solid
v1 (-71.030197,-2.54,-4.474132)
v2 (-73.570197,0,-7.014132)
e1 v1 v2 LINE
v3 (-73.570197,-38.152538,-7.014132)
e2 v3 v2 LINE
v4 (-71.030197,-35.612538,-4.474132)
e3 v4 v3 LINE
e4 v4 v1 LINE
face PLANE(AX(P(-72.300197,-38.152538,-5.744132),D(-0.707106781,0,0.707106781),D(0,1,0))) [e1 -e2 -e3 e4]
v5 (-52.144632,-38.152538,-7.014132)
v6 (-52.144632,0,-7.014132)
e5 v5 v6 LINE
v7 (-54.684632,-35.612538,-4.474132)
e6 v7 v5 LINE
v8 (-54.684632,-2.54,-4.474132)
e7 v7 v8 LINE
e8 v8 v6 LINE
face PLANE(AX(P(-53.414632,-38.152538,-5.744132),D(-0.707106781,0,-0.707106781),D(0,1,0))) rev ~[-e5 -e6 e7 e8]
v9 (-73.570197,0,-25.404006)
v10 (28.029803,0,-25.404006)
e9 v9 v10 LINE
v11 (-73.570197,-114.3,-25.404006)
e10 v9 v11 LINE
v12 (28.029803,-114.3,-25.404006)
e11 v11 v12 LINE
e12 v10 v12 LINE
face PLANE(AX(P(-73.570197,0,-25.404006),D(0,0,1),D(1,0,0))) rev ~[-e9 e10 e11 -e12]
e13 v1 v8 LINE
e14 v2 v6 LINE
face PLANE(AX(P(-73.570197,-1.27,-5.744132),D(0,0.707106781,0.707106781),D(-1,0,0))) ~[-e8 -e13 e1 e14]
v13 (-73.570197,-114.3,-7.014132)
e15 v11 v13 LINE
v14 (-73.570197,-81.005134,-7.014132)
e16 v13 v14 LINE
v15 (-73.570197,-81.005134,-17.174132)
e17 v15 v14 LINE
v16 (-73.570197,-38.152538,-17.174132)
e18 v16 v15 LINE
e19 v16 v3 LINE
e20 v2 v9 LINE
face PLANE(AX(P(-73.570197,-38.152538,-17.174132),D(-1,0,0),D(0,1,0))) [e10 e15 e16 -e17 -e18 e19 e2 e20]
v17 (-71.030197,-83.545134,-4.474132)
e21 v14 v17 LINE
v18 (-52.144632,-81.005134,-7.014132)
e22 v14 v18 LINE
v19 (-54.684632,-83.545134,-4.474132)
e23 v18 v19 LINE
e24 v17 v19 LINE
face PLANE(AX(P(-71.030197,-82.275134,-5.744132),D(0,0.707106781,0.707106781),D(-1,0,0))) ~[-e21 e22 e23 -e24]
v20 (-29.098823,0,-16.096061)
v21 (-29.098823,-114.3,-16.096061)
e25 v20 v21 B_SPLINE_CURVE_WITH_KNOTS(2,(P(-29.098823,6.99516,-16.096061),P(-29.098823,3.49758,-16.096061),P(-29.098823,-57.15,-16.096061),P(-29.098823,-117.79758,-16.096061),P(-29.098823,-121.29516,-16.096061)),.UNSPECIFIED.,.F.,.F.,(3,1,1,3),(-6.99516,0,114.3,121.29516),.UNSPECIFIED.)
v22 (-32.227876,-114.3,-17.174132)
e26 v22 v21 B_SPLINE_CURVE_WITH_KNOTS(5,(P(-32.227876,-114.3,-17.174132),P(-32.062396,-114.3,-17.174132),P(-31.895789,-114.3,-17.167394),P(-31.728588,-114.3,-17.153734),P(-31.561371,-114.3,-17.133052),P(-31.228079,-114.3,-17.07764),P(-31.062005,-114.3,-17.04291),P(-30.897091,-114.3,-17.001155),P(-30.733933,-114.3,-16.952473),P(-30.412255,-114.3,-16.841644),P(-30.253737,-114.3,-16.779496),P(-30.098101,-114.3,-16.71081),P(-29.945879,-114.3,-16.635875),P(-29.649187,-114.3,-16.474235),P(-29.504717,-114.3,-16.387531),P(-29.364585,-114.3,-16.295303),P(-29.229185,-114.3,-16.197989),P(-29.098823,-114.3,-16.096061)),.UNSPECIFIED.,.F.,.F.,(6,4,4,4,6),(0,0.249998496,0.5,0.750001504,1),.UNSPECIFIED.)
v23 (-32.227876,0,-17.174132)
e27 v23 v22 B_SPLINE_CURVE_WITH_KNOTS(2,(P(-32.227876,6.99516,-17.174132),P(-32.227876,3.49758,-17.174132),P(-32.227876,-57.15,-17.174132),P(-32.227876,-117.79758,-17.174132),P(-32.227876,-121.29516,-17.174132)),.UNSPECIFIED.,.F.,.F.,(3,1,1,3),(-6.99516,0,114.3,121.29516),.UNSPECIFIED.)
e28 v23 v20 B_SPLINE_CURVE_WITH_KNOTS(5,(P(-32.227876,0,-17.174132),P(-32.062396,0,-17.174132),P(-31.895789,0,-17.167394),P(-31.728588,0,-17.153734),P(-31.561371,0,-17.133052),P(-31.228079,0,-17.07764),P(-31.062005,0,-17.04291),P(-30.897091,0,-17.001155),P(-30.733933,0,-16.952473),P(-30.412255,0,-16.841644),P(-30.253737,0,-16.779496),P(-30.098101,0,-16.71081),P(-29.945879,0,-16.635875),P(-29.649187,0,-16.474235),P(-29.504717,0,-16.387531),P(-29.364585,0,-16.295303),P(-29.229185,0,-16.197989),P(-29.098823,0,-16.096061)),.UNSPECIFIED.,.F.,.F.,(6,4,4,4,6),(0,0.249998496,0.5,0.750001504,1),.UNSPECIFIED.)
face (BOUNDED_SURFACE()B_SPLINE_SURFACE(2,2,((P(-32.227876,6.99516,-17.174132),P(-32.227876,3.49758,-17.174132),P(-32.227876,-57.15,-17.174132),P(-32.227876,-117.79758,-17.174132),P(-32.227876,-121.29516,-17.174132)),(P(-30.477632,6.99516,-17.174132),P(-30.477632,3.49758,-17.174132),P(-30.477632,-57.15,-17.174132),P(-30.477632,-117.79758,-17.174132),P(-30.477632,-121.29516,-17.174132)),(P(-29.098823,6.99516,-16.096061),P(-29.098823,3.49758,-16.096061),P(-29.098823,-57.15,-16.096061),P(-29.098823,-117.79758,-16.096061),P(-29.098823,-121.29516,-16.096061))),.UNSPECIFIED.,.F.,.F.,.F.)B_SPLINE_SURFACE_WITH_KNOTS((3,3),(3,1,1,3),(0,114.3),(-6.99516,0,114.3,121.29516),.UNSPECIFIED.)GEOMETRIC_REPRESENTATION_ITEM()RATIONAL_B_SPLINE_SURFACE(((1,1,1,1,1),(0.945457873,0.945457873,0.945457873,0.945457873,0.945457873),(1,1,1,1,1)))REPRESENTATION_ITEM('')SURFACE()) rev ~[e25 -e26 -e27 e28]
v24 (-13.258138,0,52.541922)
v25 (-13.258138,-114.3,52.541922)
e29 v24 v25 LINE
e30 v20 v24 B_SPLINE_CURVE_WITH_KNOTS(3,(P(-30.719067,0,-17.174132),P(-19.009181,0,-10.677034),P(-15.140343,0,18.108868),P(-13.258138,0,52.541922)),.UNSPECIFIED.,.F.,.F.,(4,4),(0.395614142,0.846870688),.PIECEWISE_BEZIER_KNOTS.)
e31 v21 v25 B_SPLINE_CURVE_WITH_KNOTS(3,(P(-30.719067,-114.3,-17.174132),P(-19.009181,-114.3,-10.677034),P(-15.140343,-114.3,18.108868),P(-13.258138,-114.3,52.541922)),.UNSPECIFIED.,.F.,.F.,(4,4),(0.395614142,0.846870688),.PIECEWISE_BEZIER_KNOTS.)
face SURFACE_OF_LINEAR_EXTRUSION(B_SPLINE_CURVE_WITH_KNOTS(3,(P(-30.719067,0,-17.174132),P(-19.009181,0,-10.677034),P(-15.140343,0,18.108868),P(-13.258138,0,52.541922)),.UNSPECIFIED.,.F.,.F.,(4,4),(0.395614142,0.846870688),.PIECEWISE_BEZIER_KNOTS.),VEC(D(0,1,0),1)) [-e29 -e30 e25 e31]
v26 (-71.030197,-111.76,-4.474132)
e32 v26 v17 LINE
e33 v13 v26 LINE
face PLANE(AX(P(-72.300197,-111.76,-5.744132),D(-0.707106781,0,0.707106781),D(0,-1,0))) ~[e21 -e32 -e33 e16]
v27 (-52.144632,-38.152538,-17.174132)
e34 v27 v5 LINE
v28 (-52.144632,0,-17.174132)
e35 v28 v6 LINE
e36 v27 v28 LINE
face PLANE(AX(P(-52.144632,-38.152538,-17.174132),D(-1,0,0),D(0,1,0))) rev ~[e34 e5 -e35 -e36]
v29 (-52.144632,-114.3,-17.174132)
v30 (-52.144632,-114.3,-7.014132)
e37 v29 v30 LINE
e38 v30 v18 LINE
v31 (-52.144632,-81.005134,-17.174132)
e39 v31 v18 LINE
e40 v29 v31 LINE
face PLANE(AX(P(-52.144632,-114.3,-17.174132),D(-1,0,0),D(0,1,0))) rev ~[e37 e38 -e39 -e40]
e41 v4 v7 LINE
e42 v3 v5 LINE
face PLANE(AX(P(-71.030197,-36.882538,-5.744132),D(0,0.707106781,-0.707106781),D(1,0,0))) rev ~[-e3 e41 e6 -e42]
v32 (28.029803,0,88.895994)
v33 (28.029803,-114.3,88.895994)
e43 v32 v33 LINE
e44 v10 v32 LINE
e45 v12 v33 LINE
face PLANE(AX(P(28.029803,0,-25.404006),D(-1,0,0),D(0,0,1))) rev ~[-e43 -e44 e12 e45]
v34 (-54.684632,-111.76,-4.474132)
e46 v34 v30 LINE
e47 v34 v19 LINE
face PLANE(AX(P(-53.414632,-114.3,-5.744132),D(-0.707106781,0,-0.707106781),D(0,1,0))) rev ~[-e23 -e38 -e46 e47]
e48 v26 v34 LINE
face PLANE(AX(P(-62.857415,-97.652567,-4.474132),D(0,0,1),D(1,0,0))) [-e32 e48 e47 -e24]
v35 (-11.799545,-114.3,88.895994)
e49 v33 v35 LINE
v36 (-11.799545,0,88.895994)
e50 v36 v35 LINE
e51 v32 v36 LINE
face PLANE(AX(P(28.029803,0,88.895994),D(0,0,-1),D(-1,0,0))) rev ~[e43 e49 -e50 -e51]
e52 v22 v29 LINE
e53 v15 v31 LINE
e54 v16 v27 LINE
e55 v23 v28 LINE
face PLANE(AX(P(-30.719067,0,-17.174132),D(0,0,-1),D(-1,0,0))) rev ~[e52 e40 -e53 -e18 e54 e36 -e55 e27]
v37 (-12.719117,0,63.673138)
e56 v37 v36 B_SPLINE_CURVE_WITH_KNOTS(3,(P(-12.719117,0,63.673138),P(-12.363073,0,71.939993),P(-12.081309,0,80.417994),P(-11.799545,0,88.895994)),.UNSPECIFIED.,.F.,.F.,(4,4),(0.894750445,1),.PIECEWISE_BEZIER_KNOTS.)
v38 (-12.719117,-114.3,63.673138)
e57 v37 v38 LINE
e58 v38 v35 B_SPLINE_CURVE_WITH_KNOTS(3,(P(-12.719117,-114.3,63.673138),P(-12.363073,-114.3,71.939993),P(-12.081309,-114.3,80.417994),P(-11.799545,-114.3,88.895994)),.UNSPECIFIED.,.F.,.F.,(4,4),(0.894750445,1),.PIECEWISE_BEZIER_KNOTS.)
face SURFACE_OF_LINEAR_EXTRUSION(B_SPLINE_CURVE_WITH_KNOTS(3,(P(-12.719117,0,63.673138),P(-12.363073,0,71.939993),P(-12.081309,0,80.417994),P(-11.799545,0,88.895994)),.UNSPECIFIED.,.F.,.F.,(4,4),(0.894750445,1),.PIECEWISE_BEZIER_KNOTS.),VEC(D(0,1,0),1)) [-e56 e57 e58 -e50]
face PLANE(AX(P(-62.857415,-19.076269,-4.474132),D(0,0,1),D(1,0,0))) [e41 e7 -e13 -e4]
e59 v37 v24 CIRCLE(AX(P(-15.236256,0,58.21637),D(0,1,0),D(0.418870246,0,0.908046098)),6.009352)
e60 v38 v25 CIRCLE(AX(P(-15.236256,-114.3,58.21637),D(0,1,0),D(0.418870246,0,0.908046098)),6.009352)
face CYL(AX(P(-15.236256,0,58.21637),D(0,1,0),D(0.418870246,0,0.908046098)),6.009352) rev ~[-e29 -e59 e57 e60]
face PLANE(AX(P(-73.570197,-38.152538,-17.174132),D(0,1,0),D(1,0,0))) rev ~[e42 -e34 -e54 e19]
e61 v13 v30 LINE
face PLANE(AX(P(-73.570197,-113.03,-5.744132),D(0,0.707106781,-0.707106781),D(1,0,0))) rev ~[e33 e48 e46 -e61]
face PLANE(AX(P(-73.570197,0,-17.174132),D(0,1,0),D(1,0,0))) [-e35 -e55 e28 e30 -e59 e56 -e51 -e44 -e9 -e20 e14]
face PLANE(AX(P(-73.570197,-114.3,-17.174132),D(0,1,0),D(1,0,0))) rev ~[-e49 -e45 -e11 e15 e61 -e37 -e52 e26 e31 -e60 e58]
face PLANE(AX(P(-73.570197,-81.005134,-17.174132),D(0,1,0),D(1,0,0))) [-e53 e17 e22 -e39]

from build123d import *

# Parameters (mm, degrees)
F7_DEPTH = 114.3
F0_W     = 21.425565113
F0_H     = 33.2948663116
F8_DEPTH = 12.7
F0_H_2   = 38.15253824
F9_DEPTH = 12.7
F10_SIZE = 2.54
F1_SIZE  = 2.54
F11_SIZE = 2.54
F2_SIZE  = 2.54
F12_SIZE = 2.54
F3_SIZE  = 2.54
F4_SIZE  = 2.54
F13_R    = 5.08


# Not quite as in the source:
# - a feature of the source that left no trace in its solid (it failed there, or was rolled back) is left out


with BuildPart() as f7:
    # F6 (on Front) → F7 (new body)
    with BuildSketch(Plane.XZ):
        with BuildLine():
            Line((28.0298027718, 88.895993849), (-11.7995445112, 88.895993849))
            add(Edge.make_bspline(
                [(-12.7191172273, 63.6731384112), (-12.3630729131, 71.9399928392), (-12.0813087773, 80.417993931), (-11.7995445112, 88.895993849)],
                knots=[0.894750445, 0.894750445, 0.894750445, 0.894750445, 1, 1, 1, 1], degree=3))
            ThreePointArc((-12.7191172273, 63.6731384112), (-9.233937312, 57.9257119158), (-13.2581382148, 52.5419216657))
            add(Edge.make_bspline(
                [(-30.7190670022, -17.1741323863), (-19.0091812538, -10.6770336575), (-15.1403430342, 18.1088676273), (-13.2581382148, 52.5419216657)],
                knots=[0.3956141416, 0.3956141416, 0.3956141416, 0.3956141416, 0.846870688, 0.846870688, 0.846870688, 0.846870688], degree=3))
            add(Edge.make_bspline(
                [(-44.7375965866, -17.1741323863), (-39.4125863388, -19.0279691828), (-34.6287794117, -19.3433924519), (-30.7190670022, -17.1741323863)],
                knots=[0.2449479988, 0.2449479988, 0.2449479988, 0.2449479988, 0.3956141416, 0.3956141416, 0.3956141416, 0.3956141416], degree=3))
            Line((-44.7375965866, -17.1741323863), (-49.7875006466, -17.1741323863))
            Line((-49.7875006466, -17.1741323863), (-73.5701972282, -17.1741323863))
            Line((-73.5701972282, -17.1741323863), (-73.5701972282, -25.404006151))
            Line((-73.5701972282, -25.404006151), (28.0298027718, -25.404006151))
            Line((28.0298027718, -25.404006151), (28.0298027718, 88.895993849))
        make_face()
        with BuildLine():
            add(Edge.make_bspline(
                [(-44.7375965866, -17.1741323863), (-39.4125863388, -19.0279691828), (-34.6287794117, -19.3433924519), (-30.7190670022, -17.1741323863)],
                knots=[0.2449479988, 0.2449479988, 0.2449479988, 0.2449479988, 0.3956141416, 0.3956141416, 0.3956141416, 0.3956141416], degree=3))
            Line((-30.7190670022, -17.1741323863), (-44.7375965866, -17.1741323863))
        make_face()
    extrude(amount=F7_DEPTH)

    # F0 (on face) → F8 (join)
    with BuildSketch(Plane.XY.offset(-17.1741323863)):
        with Locations((-62.8574146717, -97.6525668442)):
            Rectangle(F0_W, F0_H)
    extrude(amount=F8_DEPTH)

    # F0 (on face) → F9 (join)
    with BuildSketch(Plane.XY.offset(-17.1741323863)):
        with Locations((-62.8574146717, -19.07626912)):
            Rectangle(F0_W, F0_H_2)
    extrude(amount=F9_DEPTH)

    # F10
    f10_edges = [f7.edges().sort_by_distance(p)[0] for p in [
        (-62.857415, 0, -4.474132),
    ]]
    chamfer(f10_edges, length=F10_SIZE)

    # F1
    f1_edges = [f7.edges().sort_by_distance(p)[0] for p in [
        (-52.144632, -20.346269, -4.474132),
        (-52.144632, -97.652567, -4.474132),
    ]]
    chamfer(f1_edges, length=F1_SIZE)

    # F11
    f11_edges = [f7.edges().sort_by_distance(p)[0] for p in [
        (-73.570197, -20.346269, -4.474132),
    ]]
    chamfer(f11_edges, length=F11_SIZE)

    # F2
    f2_edges = [f7.edges().sort_by_distance(p)[0] for p in [
        (-62.857415, -38.152538, -4.474132),
    ]]
    chamfer(f2_edges, length=F2_SIZE)

    # F12
    f12_edges = [f7.edges().sort_by_distance(p)[0] for p in [
        (-64.127415, -114.3, -4.474132),
    ]]
    chamfer(f12_edges, length=F12_SIZE)

    # F3
    f3_edges = [f7.edges().sort_by_distance(p)[0] for p in [
        (-73.570197, -96.382567, -4.474132),
    ]]
    chamfer(f3_edges, length=F3_SIZE)

    # F4
    f4_edges = [f7.edges().sort_by_distance(p)[0] for p in [
        (-62.857415, -81.005134, -4.474132),
    ]]
    chamfer(f4_edges, length=F4_SIZE)

    # F13
    f13_edges = [f7.edges().sort_by_distance(p)[0] for p in [
        (-30.719067, -57.15, -17.174132),
    ]]
    fillet(f13_edges, radius=F13_R)


solid = f7.part
